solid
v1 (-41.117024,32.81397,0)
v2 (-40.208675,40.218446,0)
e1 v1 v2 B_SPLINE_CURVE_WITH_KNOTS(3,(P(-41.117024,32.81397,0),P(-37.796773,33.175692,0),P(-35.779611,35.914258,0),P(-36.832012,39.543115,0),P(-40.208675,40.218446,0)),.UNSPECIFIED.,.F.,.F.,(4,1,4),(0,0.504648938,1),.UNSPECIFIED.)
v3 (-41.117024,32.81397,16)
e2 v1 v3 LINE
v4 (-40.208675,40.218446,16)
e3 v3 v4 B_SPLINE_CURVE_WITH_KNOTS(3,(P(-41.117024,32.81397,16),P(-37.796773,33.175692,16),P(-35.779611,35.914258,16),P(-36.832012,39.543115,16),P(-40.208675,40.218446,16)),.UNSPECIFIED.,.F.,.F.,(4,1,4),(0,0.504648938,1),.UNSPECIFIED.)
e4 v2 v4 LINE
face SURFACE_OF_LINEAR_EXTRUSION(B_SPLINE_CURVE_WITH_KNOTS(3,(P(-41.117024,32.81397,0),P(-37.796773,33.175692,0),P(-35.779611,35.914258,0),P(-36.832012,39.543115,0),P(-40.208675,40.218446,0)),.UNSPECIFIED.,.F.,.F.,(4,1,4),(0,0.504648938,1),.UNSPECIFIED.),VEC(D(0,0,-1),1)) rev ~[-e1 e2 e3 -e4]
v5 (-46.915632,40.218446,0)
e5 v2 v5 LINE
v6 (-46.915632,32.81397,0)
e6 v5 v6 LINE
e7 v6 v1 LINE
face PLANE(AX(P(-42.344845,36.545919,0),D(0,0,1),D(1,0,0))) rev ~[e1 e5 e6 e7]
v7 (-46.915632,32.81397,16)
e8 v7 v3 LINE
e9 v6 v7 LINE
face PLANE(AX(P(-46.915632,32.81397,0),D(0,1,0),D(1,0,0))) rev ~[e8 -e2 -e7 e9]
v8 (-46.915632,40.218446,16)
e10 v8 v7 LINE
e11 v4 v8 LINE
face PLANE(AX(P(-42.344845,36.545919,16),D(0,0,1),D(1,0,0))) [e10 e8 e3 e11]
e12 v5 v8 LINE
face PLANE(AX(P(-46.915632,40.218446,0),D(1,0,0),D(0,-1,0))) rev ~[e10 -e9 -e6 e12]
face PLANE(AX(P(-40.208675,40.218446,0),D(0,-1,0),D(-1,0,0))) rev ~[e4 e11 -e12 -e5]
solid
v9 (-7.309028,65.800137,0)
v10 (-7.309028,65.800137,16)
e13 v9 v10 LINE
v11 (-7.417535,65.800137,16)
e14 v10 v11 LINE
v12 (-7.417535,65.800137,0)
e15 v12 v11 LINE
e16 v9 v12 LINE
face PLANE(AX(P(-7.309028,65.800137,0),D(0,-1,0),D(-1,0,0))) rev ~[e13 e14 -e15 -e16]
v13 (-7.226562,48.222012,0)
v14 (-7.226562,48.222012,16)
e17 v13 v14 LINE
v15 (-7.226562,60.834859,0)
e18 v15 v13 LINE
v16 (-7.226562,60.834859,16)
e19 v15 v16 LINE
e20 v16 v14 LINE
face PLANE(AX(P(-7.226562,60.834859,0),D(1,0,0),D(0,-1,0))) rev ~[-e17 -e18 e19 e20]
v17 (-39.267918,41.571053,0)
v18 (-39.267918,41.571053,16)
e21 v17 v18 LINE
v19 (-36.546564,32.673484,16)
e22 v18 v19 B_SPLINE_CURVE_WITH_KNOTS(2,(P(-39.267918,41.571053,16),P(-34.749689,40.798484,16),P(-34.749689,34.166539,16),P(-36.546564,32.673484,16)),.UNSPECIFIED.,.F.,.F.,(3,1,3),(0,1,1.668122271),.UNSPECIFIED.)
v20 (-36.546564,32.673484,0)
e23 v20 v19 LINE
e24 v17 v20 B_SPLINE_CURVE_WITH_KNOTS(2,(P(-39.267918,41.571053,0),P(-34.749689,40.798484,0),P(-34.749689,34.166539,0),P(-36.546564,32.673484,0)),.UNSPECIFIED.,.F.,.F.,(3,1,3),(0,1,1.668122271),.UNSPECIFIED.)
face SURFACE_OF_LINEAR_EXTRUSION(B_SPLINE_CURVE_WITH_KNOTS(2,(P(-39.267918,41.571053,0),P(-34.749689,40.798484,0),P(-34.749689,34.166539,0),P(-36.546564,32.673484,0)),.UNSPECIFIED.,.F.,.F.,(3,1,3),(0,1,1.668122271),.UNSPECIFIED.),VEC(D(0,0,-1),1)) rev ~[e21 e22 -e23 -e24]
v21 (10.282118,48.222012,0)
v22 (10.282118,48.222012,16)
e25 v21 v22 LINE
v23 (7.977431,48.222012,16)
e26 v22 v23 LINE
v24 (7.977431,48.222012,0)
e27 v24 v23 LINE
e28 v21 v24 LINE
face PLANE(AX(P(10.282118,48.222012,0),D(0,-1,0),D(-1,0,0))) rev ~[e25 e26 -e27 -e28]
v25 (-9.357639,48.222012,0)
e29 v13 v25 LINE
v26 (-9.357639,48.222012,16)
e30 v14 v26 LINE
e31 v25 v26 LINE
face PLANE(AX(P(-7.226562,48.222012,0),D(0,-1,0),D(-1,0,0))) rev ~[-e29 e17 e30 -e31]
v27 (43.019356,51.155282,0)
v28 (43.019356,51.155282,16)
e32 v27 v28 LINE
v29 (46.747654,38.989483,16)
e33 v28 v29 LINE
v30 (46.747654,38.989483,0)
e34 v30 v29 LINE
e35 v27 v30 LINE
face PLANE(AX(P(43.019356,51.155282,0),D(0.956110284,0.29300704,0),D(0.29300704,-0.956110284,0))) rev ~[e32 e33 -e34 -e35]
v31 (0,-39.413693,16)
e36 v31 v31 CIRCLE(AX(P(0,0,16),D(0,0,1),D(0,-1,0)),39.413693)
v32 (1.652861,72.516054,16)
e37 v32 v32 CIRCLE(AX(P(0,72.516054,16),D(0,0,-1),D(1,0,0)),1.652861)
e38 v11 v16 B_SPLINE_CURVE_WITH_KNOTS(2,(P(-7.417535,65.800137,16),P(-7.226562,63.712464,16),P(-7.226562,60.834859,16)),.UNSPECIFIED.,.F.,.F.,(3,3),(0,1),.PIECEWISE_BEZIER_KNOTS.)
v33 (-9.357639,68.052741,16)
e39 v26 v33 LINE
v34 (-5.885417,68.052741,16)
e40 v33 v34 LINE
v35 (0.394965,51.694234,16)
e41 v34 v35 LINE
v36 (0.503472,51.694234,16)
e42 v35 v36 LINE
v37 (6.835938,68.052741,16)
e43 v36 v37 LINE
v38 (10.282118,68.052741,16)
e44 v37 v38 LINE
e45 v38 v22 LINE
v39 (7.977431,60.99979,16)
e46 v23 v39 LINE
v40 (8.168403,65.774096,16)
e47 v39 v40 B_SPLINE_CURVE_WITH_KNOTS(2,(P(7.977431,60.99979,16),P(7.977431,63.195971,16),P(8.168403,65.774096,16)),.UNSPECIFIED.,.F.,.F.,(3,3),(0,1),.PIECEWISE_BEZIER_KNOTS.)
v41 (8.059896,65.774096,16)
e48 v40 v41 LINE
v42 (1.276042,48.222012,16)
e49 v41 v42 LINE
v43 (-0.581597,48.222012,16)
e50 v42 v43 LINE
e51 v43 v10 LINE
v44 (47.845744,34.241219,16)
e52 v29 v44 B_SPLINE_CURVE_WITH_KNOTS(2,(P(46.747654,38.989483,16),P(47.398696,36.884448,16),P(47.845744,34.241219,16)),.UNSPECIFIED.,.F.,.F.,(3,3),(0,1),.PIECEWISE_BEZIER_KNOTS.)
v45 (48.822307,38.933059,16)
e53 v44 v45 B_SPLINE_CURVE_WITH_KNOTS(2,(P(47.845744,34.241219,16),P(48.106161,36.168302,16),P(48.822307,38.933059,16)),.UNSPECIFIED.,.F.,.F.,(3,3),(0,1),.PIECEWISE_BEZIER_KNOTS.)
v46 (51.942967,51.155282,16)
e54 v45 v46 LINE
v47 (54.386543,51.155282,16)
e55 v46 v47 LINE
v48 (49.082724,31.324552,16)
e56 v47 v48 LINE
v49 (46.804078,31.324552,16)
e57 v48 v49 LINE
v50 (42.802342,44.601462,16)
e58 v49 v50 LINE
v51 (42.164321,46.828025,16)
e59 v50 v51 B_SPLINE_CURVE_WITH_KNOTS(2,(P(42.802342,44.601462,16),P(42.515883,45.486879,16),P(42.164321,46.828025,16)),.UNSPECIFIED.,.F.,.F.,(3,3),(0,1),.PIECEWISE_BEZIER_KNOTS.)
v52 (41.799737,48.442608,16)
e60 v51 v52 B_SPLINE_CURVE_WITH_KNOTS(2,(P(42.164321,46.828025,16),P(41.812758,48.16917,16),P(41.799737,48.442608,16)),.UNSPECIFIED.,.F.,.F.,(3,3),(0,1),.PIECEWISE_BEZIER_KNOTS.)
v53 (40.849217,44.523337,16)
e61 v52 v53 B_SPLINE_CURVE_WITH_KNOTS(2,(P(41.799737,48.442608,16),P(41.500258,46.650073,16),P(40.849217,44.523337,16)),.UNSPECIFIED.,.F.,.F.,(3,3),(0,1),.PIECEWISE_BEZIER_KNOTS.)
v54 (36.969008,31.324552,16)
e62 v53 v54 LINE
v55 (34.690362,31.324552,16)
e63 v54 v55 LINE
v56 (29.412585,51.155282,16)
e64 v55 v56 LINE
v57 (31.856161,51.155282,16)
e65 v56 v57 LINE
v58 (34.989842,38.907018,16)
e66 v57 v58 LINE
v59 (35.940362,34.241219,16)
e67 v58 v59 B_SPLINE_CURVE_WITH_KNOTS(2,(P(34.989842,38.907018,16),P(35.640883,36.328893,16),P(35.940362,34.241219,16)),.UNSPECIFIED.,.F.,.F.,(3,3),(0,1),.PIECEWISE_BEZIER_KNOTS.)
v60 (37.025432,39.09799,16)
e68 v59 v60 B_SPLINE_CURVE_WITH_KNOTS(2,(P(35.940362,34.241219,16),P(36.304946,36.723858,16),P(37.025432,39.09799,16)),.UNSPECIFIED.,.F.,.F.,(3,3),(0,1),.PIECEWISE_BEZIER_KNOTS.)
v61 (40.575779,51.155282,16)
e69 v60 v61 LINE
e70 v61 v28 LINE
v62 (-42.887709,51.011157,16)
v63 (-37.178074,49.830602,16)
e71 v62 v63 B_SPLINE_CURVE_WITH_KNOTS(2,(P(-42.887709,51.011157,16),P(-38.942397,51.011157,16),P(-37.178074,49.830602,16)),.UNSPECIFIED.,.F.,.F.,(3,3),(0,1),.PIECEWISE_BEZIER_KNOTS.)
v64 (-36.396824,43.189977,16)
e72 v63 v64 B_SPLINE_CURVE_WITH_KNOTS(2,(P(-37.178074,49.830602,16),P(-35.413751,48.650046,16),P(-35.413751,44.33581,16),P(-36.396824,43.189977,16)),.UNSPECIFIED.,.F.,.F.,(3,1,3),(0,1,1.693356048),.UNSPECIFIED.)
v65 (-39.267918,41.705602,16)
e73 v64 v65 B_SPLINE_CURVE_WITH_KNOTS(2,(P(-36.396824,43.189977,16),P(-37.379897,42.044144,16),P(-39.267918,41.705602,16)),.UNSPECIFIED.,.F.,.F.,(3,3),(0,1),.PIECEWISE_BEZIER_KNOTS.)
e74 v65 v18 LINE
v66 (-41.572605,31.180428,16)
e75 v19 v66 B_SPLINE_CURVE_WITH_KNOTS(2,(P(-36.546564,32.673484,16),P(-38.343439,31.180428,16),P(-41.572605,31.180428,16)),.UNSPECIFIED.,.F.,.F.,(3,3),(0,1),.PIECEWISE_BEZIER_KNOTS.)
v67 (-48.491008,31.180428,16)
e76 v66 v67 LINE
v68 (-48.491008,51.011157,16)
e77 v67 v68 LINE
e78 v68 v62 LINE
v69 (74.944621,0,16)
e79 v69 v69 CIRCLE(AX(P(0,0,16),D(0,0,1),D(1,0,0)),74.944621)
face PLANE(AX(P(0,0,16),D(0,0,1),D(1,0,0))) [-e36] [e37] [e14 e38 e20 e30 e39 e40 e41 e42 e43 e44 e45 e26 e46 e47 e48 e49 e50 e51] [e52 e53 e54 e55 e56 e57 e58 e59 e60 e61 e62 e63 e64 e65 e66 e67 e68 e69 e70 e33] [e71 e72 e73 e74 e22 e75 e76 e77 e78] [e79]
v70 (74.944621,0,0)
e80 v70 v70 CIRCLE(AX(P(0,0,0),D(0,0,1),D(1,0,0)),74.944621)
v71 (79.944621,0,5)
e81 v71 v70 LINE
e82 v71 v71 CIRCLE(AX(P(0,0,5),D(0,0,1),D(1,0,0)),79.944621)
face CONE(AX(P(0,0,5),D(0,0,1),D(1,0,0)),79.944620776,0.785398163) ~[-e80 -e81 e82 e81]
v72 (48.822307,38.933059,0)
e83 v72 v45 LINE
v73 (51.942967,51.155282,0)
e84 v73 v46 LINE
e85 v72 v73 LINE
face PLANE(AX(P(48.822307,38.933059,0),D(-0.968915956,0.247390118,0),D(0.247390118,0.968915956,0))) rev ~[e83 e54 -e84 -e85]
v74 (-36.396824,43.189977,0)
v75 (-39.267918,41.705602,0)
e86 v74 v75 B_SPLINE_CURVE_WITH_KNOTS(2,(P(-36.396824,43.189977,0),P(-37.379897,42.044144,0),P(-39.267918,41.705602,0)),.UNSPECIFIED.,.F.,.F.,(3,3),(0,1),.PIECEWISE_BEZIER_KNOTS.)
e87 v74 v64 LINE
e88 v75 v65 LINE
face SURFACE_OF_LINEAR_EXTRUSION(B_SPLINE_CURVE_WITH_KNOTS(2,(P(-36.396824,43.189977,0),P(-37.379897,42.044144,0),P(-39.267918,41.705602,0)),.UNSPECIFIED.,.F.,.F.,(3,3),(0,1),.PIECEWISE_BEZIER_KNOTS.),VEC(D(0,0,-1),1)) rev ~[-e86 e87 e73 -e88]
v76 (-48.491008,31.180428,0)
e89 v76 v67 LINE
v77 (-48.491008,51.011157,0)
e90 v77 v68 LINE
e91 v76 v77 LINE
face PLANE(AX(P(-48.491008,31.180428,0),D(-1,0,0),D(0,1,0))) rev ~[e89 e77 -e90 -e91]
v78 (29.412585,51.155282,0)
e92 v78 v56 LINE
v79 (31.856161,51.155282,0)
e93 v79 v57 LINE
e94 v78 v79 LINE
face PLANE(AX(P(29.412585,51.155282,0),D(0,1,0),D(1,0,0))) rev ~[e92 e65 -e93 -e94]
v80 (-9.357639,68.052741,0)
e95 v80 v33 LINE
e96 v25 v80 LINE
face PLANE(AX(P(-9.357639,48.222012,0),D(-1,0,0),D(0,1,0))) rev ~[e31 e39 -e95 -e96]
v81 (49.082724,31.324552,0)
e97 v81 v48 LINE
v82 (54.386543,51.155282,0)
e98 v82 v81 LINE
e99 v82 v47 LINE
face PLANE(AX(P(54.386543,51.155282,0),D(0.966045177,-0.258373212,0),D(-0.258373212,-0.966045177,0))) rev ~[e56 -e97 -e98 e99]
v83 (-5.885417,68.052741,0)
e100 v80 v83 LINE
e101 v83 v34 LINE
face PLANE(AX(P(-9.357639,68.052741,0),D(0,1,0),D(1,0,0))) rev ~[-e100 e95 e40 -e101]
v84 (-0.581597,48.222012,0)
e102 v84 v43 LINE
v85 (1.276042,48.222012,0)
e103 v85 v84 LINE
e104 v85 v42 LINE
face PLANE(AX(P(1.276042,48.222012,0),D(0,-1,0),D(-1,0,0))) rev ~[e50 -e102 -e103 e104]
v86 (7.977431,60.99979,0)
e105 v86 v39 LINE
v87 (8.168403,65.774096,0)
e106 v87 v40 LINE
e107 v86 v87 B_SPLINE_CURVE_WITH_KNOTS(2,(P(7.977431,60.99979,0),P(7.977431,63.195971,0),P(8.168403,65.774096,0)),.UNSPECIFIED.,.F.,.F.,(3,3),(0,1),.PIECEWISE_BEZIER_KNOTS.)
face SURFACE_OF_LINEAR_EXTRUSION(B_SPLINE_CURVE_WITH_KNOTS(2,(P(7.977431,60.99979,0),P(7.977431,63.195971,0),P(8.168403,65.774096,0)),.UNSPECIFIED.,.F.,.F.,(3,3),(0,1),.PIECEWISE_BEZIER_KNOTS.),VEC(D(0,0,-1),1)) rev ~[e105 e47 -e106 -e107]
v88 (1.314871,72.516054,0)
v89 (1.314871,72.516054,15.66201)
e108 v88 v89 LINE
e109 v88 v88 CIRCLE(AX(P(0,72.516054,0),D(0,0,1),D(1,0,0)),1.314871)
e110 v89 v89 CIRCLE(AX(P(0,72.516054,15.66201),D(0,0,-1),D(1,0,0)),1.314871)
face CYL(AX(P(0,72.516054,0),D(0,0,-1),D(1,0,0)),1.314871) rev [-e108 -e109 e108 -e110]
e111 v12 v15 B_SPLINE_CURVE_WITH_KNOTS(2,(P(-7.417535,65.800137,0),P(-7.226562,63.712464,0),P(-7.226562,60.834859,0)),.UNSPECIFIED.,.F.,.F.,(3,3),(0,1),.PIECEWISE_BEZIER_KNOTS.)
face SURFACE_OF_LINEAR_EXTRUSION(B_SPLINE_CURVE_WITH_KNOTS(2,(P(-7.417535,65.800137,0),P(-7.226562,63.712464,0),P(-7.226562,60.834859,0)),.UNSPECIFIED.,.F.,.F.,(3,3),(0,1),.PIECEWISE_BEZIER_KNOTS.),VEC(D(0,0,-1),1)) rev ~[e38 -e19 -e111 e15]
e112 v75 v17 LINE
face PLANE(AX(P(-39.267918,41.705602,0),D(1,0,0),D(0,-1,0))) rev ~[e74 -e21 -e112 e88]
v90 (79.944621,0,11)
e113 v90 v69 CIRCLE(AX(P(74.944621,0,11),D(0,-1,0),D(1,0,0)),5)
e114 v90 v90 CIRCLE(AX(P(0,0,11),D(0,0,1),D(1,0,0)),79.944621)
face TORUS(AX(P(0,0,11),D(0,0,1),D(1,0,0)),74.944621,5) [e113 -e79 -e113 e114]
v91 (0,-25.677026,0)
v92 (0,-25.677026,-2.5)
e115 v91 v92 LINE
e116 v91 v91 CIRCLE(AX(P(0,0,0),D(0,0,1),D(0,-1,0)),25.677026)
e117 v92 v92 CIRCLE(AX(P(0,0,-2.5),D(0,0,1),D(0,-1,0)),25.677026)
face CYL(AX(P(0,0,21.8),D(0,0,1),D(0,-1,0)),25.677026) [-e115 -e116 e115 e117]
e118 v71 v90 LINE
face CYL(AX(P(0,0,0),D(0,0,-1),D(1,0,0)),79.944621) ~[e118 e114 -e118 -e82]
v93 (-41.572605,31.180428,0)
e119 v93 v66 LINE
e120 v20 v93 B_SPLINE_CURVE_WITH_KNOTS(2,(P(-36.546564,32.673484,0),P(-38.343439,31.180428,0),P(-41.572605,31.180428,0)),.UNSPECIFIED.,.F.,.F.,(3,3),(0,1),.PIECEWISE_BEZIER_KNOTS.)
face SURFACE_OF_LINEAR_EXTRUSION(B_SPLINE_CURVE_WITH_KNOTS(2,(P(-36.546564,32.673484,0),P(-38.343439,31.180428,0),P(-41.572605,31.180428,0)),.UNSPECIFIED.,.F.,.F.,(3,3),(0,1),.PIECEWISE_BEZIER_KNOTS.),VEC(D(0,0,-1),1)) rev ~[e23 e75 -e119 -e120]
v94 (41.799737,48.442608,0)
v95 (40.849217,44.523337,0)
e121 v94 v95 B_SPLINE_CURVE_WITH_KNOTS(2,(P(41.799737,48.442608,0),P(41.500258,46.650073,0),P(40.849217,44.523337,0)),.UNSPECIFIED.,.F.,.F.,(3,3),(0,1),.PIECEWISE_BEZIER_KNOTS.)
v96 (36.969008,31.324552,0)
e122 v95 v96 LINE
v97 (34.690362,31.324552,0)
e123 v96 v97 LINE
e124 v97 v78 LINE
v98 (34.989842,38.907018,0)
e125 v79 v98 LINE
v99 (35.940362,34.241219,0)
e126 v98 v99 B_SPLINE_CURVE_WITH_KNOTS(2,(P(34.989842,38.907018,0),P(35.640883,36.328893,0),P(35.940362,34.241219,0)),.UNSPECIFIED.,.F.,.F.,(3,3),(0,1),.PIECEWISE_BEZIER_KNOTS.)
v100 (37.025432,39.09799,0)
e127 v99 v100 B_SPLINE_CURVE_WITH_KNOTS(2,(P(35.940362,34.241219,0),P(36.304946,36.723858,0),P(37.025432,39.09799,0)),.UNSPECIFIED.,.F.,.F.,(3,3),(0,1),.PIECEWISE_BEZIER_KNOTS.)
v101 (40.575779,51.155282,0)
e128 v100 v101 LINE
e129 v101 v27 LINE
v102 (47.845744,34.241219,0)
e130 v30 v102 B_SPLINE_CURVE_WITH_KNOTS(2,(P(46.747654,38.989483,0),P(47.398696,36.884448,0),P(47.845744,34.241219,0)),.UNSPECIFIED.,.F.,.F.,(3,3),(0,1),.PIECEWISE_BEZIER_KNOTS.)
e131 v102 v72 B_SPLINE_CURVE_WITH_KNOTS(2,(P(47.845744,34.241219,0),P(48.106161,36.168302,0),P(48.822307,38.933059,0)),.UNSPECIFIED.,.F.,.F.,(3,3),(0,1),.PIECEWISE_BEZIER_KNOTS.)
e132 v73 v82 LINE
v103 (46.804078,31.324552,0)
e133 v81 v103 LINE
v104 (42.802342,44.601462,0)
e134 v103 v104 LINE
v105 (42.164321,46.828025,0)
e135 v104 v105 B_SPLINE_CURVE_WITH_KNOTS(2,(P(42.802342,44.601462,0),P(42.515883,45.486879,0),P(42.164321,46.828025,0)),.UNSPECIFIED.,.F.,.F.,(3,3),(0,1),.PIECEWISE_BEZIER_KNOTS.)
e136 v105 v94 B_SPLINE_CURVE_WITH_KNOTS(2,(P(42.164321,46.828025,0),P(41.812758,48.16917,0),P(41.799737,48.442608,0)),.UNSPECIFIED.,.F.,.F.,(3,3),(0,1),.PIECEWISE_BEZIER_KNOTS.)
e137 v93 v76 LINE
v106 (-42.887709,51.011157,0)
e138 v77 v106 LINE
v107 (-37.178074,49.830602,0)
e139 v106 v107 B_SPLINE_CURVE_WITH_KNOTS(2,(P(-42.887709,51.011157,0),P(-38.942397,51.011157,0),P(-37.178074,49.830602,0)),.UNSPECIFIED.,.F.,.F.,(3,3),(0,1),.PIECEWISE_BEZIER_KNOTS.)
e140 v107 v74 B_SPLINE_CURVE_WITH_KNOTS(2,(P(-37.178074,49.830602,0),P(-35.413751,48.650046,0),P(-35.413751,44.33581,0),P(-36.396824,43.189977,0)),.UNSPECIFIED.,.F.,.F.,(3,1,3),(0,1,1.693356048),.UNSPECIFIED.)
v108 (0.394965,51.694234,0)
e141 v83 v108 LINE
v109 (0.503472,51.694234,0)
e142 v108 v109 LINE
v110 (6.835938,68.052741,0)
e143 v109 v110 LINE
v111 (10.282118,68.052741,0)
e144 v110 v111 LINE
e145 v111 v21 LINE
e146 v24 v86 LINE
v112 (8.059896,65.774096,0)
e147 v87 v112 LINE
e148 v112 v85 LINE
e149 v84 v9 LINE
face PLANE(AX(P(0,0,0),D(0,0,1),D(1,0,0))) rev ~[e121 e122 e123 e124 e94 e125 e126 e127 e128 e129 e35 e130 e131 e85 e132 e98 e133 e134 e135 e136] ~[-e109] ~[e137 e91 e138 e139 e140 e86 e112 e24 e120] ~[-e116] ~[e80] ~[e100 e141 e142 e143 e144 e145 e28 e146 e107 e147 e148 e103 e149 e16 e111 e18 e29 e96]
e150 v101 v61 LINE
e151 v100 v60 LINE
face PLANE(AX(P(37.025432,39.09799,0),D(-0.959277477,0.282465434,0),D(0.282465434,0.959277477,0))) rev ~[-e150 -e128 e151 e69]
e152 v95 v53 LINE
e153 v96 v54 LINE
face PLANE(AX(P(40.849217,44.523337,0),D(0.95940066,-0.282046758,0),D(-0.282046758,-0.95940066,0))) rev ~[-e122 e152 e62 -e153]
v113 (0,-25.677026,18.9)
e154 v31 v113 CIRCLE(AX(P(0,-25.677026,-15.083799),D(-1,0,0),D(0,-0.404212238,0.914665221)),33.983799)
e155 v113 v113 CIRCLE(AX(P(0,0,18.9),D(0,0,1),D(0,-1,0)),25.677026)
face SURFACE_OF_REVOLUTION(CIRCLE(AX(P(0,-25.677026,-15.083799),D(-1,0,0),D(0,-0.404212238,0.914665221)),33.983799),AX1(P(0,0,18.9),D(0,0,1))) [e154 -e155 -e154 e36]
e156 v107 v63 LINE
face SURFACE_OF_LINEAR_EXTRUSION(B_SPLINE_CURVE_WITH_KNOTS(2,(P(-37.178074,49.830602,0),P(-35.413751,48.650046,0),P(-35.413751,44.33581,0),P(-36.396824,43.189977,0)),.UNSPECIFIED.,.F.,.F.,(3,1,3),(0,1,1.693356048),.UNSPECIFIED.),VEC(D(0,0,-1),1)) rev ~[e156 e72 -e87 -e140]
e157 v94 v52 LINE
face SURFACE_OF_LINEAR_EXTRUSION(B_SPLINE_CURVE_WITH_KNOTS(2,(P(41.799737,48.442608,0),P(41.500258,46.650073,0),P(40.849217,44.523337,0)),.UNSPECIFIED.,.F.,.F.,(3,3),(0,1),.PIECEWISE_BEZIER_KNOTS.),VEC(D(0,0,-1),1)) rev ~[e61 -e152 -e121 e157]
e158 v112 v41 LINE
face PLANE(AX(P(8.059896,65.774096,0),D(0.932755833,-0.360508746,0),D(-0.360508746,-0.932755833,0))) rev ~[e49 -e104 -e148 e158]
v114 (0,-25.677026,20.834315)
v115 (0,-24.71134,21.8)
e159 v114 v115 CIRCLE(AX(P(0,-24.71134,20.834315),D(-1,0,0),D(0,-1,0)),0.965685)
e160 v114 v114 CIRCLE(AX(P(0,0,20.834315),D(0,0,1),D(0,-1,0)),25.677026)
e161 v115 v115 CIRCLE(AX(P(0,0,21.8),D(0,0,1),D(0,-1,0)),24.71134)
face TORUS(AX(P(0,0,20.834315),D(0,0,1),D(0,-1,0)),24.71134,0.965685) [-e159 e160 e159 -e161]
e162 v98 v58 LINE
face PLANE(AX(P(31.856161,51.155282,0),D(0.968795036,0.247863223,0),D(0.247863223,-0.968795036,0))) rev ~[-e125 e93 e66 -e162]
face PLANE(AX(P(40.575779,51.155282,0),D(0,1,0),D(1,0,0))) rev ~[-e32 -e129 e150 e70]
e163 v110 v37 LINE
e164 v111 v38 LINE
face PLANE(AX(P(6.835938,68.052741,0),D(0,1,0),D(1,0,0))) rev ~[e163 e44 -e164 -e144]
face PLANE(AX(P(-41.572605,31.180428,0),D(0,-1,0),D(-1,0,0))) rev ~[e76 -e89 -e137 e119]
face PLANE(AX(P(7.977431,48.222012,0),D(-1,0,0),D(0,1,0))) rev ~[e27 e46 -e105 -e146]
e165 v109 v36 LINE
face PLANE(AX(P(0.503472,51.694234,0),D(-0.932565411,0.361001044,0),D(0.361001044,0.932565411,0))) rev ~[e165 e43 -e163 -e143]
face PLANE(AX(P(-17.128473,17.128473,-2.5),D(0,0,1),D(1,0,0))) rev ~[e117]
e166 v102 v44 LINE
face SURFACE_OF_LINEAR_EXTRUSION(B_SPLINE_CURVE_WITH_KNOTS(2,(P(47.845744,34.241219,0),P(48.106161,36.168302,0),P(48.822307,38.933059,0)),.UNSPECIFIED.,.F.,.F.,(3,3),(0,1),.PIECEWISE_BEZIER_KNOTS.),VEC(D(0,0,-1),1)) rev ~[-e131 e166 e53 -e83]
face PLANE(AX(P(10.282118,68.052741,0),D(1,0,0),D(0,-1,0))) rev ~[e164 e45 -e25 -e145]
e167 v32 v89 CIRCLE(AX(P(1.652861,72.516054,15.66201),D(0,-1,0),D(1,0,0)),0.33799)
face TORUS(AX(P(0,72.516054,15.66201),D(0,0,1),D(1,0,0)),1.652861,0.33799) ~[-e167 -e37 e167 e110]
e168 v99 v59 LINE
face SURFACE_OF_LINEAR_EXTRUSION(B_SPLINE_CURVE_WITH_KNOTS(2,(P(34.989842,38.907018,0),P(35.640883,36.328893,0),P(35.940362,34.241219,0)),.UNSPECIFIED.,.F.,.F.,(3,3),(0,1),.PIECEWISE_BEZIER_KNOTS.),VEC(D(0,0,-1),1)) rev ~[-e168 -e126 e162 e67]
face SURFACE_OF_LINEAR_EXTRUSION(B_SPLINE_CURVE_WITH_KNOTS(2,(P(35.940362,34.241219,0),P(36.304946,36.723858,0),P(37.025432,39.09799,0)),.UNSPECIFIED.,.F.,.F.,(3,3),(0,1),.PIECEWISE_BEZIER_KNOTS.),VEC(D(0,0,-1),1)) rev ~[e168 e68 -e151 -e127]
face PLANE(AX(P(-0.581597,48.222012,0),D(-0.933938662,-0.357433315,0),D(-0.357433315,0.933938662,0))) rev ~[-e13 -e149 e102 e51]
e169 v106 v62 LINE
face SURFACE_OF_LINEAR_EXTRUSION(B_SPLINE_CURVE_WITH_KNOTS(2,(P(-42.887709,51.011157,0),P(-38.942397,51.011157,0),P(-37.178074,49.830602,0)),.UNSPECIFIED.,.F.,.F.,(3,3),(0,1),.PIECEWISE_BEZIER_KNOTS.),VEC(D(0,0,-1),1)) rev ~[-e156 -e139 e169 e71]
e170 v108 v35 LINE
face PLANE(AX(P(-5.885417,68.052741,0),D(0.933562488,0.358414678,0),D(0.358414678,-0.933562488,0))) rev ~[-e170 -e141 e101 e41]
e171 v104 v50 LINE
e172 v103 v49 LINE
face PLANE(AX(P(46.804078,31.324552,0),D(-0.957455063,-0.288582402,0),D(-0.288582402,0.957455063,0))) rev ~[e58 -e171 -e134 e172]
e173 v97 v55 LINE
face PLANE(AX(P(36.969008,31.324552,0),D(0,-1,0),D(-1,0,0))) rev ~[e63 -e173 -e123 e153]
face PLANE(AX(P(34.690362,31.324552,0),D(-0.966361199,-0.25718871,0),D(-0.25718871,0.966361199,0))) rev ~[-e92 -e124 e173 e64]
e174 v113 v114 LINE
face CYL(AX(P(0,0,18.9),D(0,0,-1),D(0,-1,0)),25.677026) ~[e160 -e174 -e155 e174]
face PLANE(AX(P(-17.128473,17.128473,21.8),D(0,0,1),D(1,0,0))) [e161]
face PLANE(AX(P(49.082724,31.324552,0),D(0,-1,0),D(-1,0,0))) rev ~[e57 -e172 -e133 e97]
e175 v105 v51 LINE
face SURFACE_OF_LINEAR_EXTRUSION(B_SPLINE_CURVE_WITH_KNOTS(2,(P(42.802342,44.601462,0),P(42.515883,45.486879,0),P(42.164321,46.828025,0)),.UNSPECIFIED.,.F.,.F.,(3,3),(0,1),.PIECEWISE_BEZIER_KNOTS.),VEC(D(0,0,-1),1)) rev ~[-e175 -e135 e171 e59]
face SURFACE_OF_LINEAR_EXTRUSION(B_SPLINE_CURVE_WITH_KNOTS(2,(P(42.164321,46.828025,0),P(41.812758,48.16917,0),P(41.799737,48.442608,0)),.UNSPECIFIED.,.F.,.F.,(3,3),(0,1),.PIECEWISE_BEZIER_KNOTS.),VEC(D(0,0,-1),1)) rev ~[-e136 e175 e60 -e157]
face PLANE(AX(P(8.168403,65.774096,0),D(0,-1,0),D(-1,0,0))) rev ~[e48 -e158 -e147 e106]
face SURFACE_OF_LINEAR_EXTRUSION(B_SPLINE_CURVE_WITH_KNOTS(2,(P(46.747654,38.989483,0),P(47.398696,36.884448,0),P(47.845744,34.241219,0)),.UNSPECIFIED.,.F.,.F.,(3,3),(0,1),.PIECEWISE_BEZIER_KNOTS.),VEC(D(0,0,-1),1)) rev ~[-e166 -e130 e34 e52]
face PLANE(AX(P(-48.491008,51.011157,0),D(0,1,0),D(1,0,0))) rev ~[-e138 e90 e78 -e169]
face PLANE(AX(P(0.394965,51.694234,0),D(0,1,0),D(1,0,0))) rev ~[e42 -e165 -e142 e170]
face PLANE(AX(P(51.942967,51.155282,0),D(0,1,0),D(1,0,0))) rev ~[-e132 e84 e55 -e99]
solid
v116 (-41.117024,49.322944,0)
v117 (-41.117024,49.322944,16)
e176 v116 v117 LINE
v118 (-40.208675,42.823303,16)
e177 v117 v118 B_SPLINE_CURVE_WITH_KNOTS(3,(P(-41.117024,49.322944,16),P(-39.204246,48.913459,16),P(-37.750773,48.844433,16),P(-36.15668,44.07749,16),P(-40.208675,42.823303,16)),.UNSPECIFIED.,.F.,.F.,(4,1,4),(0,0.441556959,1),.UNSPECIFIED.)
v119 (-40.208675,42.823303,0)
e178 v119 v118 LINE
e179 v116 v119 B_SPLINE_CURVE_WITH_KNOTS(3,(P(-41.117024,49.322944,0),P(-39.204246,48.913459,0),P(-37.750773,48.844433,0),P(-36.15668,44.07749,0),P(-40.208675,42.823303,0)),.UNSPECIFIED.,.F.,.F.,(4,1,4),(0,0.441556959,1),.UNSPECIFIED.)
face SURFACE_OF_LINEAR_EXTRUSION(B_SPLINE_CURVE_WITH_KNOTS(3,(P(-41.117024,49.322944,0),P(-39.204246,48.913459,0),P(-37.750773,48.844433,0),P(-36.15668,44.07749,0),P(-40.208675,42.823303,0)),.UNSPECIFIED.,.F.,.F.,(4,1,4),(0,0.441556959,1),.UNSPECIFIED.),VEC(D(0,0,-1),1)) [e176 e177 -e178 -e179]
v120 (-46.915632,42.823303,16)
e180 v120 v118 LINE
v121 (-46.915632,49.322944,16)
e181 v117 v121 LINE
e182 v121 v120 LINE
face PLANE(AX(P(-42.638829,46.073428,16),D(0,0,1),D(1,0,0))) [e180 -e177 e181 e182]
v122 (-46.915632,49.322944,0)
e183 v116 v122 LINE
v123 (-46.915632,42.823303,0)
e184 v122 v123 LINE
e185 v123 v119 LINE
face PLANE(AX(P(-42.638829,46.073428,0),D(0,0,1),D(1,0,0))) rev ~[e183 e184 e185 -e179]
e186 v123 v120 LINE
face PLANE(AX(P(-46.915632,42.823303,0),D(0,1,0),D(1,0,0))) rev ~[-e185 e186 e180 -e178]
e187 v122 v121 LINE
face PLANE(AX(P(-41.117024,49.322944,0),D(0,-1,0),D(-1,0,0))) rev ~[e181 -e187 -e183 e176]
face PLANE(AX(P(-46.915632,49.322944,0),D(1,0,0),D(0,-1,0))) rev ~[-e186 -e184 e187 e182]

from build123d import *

# Parameters (mm, degrees)
F1_DEPTH   = 18.9
F0_R       = 79.944620776
F2_DEPTH   = 16
F4_R       = 5
F5_SIZE    = 5
F6_DEPTH   = 3
F8_DEPTH   = 2.9
F12_DEPTH  = 16
F13_DEPTH  = 24.3
F15_R      = 0.9656854249
F16_R      = 2.2829721339
F17_DEPTH  = 48.9
F18_R      = 1.3148708501
F18_R_2    = 0.6355346819
F19_DEPTH  = 41.5
F19_FACE_R = 0.6355346819
F20_DEPTH  = 21.5
F21_R      = 0.3379898987


# Not quite as in the source:
# - a fillet or chamfer that OpenCascade refuses, or shapes differently, is made with other operations: its cross-section is extruded or revolved along the edge and cut away or added
# - the program builds the solid bodies; features that only make, move or delete a surface that nothing else refers to are left out


with BuildPart() as f1:
    # F0 (on Top) → F1 (new body)
    with BuildSketch(Plane.XY):
        with BuildLine():
            Line((0, 0), (0, 41.5136932319))
            ThreePointArc((0, 41.5136932319), (-29.3546139964, 29.3546139964), (-41.5136932319, 0))
            Line((-41.5136932319, 0), (0, 0))
        make_face()
        with BuildLine():
            Line((0, 0), (41.5136932319, 0))
            ThreePointArc((41.5136932319, 0), (29.3546139964, 29.3546139964), (0, 41.5136932319))
            Line((0, 41.5136932319), (0, 0))
        make_face()
        with BuildLine():
            ThreePointArc((-41.5136932319, 0), (-29.3546139964, -29.3546139964), (0, -41.5136932319))
            Line((0, -41.5136932319), (0, 0))
            Line((0, 0), (-41.5136932319, 0))
        make_face()
        with BuildLine():
            ThreePointArc((0, -41.5136932319), (29.3546139964, -29.3546139964), (41.5136932319, 0))
            Line((41.5136932319, 0), (0, 0))
            Line((0, 0), (0, -41.5136932319))
        make_face()
    extrude(amount=F1_DEPTH)

    # F0 (on Top) → F2 (join)
    with BuildSketch(Plane.XY):
        Circle(F0_R)
        with BuildLine():
            Line((-48.4910080516, 31.1804282402), (-48.4910080516, 51.0111574069))
            Line((-48.4910080516, 51.0111574069), (-42.8877094405, 51.0111574069))
            add(Edge.make_bspline(
                [(-42.8877094405, 51.0111574069), (-38.9423969405, 51.0111574069), (-37.1780740238, 49.8306018513)],
                knots=[0, 0, 0, 1, 1, 1], degree=2))
            add(Edge.make_bspline(
                [(-37.1780740238, 49.8306018513), (-35.4137511071, 48.6500462958), (-35.4137511071, 46.1023032402)],
                knots=[0, 0, 0, 1, 1, 1], degree=2))
            add(Edge.make_bspline(
                [(-35.4137511071, 46.1023032402), (-35.4137511071, 44.3358101847), (-36.3968240238, 43.1899768513)],
                knots=[0, 0, 0, 1, 1, 1], degree=2))
            add(Edge.make_bspline(
                [(-36.3968240238, 43.1899768513), (-37.3798969405, 42.044143518), (-39.2679177738, 41.7056018513)],
                knots=[0, 0, 0, 1, 1, 1], degree=2))
            Line((-39.2679177738, 41.7056018513), (-39.2679177738, 41.5710532402))
            add(Edge.make_bspline(
                [(-39.2679177738, 41.5710532402), (-34.7496886071, 40.7984837958), (-34.7496886071, 36.8227893513)],
                knots=[0, 0, 0, 1, 1, 1], degree=2))
            add(Edge.make_bspline(
                [(-34.7496886071, 36.8227893513), (-34.7496886071, 34.1665393513), (-36.5465636071, 32.6734837958)],
                knots=[0, 0, 0, 1, 1, 1], degree=2))
            add(Edge.make_bspline(
                [(-36.5465636071, 32.6734837958), (-38.3434386071, 31.1804282402), (-41.5726052738, 31.1804282402)],
                knots=[0, 0, 0, 1, 1, 1], degree=2))
            Line((-41.5726052738, 31.1804282402), (-48.4910080516, 31.1804282402))
        make_face(mode=Mode.SUBTRACT)
        with BuildLine():
            ThreePointArc((0, 41.5136932319), (29.3546139964, 29.3546139964), (41.5136932319, 0))
            ThreePointArc((41.5136932319, 0), (29.3546139964, -29.3546139964), (0, -41.5136932319))
            ThreePointArc((0, -41.5136932319), (-29.3546139964, -29.3546139964), (-41.5136932319, 0))
            ThreePointArc((-41.5136932319, 0), (-29.3546139964, 29.3546139964), (0, 41.5136932319))
        make_face(mode=Mode.SUBTRACT)
        with BuildLine():
            Line((1.2760416667, 48.2220121983), (-0.5815972222, 48.2220121983))
            Line((-0.5815972222, 48.2220121983), (-7.3090277778, 65.8001371983))
            Line((-7.3090277778, 65.8001371983), (-7.4175347222, 65.8001371983))
            add(Edge.make_bspline(
                [(-7.4175347222, 65.8001371983), (-7.2265625, 63.7124635872), (-7.2265625, 60.8348594206)],
                knots=[0, 0, 0, 1, 1, 1], degree=2))
            Line((-7.2265625, 60.8348594206), (-7.2265625, 48.2220121983))
            Line((-7.2265625, 48.2220121983), (-9.3576388889, 48.2220121983))
            Line((-9.3576388889, 48.2220121983), (-9.3576388889, 68.052741365))
            Line((-9.3576388889, 68.052741365), (-5.8854166667, 68.052741365))
            Line((-5.8854166667, 68.052741365), (0.3949652778, 51.6942344206))
            Line((0.3949652778, 51.6942344206), (0.5034722222, 51.6942344206))
            Line((0.5034722222, 51.6942344206), (6.8359375, 68.052741365))
            Line((6.8359375, 68.052741365), (10.2821180556, 68.052741365))
            Line((10.2821180556, 68.052741365), (10.2821180556, 48.2220121983))
            Line((10.2821180556, 48.2220121983), (7.9774305556, 48.2220121983))
            Line((7.9774305556, 48.2220121983), (7.9774305556, 60.9997899761))
            add(Edge.make_bspline(
                [(7.9774305556, 60.9997899761), (7.9774305556, 63.1959705317), (8.1684027778, 65.7740955317)],
                knots=[0, 0, 0, 1, 1, 1], degree=2))
            Line((8.1684027778, 65.7740955317), (8.0598958333, 65.7740955317))
            Line((8.0598958333, 65.7740955317), (1.2760416667, 48.2220121983))
        make_face(mode=Mode.SUBTRACT)
        with BuildLine():
            Line((54.386543, 51.1552815385), (49.0827235555, 31.3245523718))
            Line((49.0827235555, 31.3245523718), (46.8040777222, 31.3245523718))
            Line((46.8040777222, 31.3245523718), (42.8023416111, 44.601462094))
            add(Edge.make_bspline(
                [(42.8023416111, 44.601462094), (42.5158832777, 45.4868787607), (42.1643207777, 46.828024594)],
                knots=[0, 0, 0, 1, 1, 1], degree=2))
            add(Edge.make_bspline(
                [(42.1643207777, 46.828024594), (41.8127582777, 48.1691704274), (41.7997374444, 48.4426079274)],
                knots=[0, 0, 0, 1, 1, 1], degree=2))
            add(Edge.make_bspline(
                [(41.7997374444, 48.4426079274), (41.5002582777, 46.6500732051), (40.8492166111, 44.523337094)],
                knots=[0, 0, 0, 1, 1, 1], degree=2))
            Line((40.8492166111, 44.523337094), (36.9690082777, 31.3245523718))
            Line((36.9690082777, 31.3245523718), (34.6903624444, 31.3245523718))
            Line((34.6903624444, 31.3245523718), (29.4125846666, 51.1552815385))
            Line((29.4125846666, 51.1552815385), (31.8561610555, 51.1552815385))
            Line((31.8561610555, 51.1552815385), (34.9898416111, 38.9070176496))
            add(Edge.make_bspline(
                [(34.9898416111, 38.9070176496), (35.6408832777, 36.3288926496), (35.9403624444, 34.2412190385)],
                knots=[0, 0, 0, 1, 1, 1], degree=2))
            add(Edge.make_bspline(
                [(35.9403624444, 34.2412190385), (36.3049457777, 36.7238579274), (37.0254318888, 39.0979898718)],
                knots=[0, 0, 0, 1, 1, 1], degree=2))
            Line((37.0254318888, 39.0979898718), (40.5757791111, 51.1552815385))
            Line((40.5757791111, 51.1552815385), (43.0193555, 51.1552815385))
            Line((43.0193555, 51.1552815385), (46.7476541111, 38.9894829274))
            add(Edge.make_bspline(
                [(46.7476541111, 38.9894829274), (47.3986957777, 36.8844482051), (47.8457443888, 34.2412190385)],
                knots=[0, 0, 0, 1, 1, 1], degree=2))
            add(Edge.make_bspline(
                [(47.8457443888, 34.2412190385), (48.1061610555, 36.1683023718), (48.8223068888, 38.9330593162)],
                knots=[0, 0, 0, 1, 1, 1], degree=2))
            Line((48.8223068888, 38.9330593162), (51.9429666111, 51.1552815385))
            Line((51.9429666111, 51.1552815385), (54.386543, 51.1552815385))
        make_face(mode=Mode.SUBTRACT)
    extrude(amount=F2_DEPTH)

    # F3: chamfer of 5 on 1 edges, made by hand


with BuildPart() as f3_tool2:
    # F3_s3 → F3_t4 (revolve)
    with BuildSketch(Plane.YZ):
        Polygon((-41.5136932319, 13.9), (-36.5136932319, 18.9), (-41.5136932319, 18.9), align=None)
    revolve(axis=Axis((0, 0, 18.9), (0, 0, 1)))

    split(bisect_by=Plane.XY.offset(16), keep=Keep.TOP)


with BuildPart() as f1_1:
    add(f1.part)

    # F3_t1: cut F3_tool2
    add(f3_tool2.part, mode=Mode.SUBTRACT)

    # F4
    f4_edges = [f1_1.edges().sort_by_distance(p)[0] for p in [
        (-79.944621, 0, 16),
    ]]
    fillet(f4_edges, radius=F4_R)

    # F5
    f5_edges = [f1_1.edges().sort_by_distance(p)[0] for p in [
        (-79.944621, 0, 0),
    ]]
    chamfer(f5_edges, length=F5_SIZE)

    # F6 (add): a face of the model
    f6_faces = [f1_1.faces().sort_by_distance(p)[0] for p in [
        (0, 0, 18.9),
    ]]
    extrude(f6_faces, amount=-F6_DEPTH)

    # F7: fillet of radius 33.9837993167 on 1 edges, made by hand

    # F7_s1 → F7_t2 (revolve, cut)
    with BuildSketch(Plane.YZ):
        with BuildLine():
            ThreePointArc((-39.4136932319, 16), (-32.6967485164, 18.1670970169), (-25.677025658, 18.9))
            Line((-25.677025658, 18.9), (-36.5136932319, 18.9))
            Line((-36.5136932319, 18.9), (-39.4136932319, 16))
        make_face()
    revolve(axis=Axis((0, 0, 18.9), (0, 0, 1)), mode=Mode.SUBTRACT)

    # F8 (add): a face of the model
    f8_faces = [f1_1.faces().sort_by_distance(p)[0] for p in [
        (0, 0, 18.9),
    ]]
    extrude(f8_faces, amount=F8_DEPTH)

    # F13 (add): a face of the model
    f13_faces = [f1_1.faces().sort_by_distance(p)[0] for p in [
        (0, 0, 21.8),
    ]]
    extrude(f13_faces, amount=-F13_DEPTH)

    # F15
    f15_edges = [f1_1.edges().sort_by_distance(p)[0] for p in [
        (0, 25.677026, 21.8),
    ]]
    fillet(f15_edges, radius=F15_R)

    # F16 (on Top) → F17 (cut)
    with BuildSketch(Plane.XY):
        with Locations((0, 71.3628157973)):
            Circle(F16_R)
    extrude(amount=-F17_DEPTH, mode=Mode.SUBTRACT)

    # F18 (on Top) → F19 (cut)
    with BuildSketch(Plane.XY):
        with Locations((0, 72.516053915)):
            Circle(F18_R)
        with Locations((0, 72.516053915)):
            Circle(F18_R_2, mode=Mode.SUBTRACT)
    extrude(amount=F19_DEPTH, mode=Mode.SUBTRACT)

    # F18 (on Top) + F19_face (on face) → F20 (cut)
    with BuildSketch(Plane.XY):
        with Locations((0, 72.516053915)):
            Circle(F18_R)
        with Locations((0, 72.516053915)):
            Circle(F18_R_2, mode=Mode.SUBTRACT)
    with BuildSketch(Plane(origin=(0, 72.516053915, 16), x_dir=(1, 0, 0), z_dir=(0, 0, 1))):
        Circle(F19_FACE_R)
    extrude(amount=-F20_DEPTH, mode=Mode.SUBTRACT)

    # F21
    f21_edges = [f1_1.edges().sort_by_distance(p)[0] for p in [
        (-1.314871, 72.516054, 16),
    ]]
    fillet(f21_edges, radius=F21_R)


with BuildPart() as f12:
    # F11 (on Top) → F12 (new body)
    with BuildSketch(Plane.XY):
        with BuildLine():
            Line((-41.1170236766, 49.3229441345), (-46.9156317413, 49.3229441345))
            Line((-46.9156317413, 49.3229441345), (-46.9156317413, 42.8233034909))
            Line((-46.9156317413, 42.8233034909), (-44.3502888083, 42.8233034909))
            Line((-44.3502888083, 42.8233034909), (-40.2086749673, 42.8233034909))
            add(Edge.make_bspline(
                [(-41.1170236766, 49.3229441345), (-39.204246299, 48.9134589045), (-37.7507729109, 48.8444333294), (-36.1566804349, 44.0774895251), (-40.2086749673, 42.8233034909)],
                knots=[0, 0, 0, 0, 0.4415569588, 1, 1, 1, 1], degree=3))
        make_face()
    extrude(amount=F12_DEPTH)


with BuildPart() as f12b:
    # F11 (on Top) → F12, piece 2 (new body)
    with BuildSketch(Plane.XY):
        with BuildLine():
            Line((-46.9156317413, 40.2184464037), (-46.9156317413, 32.8139699996))
            Line((-46.9156317413, 32.8139699996), (-41.1170236766, 32.8139699996))
            add(Edge.make_bspline(
                [(-41.1170236766, 32.8139699996), (-37.7967730165, 33.1756919622), (-35.7796114313, 35.9142584701), (-36.8320122361, 39.5431146026), (-40.2086749673, 40.2184464037)],
                knots=[0, 0, 0, 0, 0.5046489381, 1, 1, 1, 1], degree=3))
            Line((-40.2086749673, 40.2184464037), (-44.3502888083, 40.2184464037))
            Line((-44.3502888083, 40.2184464037), (-46.9156317413, 40.2184464037))
        make_face()
    extrude(amount=F12_DEPTH)


solid = Compound([f1_1.part, f12.part, f12b.part])
